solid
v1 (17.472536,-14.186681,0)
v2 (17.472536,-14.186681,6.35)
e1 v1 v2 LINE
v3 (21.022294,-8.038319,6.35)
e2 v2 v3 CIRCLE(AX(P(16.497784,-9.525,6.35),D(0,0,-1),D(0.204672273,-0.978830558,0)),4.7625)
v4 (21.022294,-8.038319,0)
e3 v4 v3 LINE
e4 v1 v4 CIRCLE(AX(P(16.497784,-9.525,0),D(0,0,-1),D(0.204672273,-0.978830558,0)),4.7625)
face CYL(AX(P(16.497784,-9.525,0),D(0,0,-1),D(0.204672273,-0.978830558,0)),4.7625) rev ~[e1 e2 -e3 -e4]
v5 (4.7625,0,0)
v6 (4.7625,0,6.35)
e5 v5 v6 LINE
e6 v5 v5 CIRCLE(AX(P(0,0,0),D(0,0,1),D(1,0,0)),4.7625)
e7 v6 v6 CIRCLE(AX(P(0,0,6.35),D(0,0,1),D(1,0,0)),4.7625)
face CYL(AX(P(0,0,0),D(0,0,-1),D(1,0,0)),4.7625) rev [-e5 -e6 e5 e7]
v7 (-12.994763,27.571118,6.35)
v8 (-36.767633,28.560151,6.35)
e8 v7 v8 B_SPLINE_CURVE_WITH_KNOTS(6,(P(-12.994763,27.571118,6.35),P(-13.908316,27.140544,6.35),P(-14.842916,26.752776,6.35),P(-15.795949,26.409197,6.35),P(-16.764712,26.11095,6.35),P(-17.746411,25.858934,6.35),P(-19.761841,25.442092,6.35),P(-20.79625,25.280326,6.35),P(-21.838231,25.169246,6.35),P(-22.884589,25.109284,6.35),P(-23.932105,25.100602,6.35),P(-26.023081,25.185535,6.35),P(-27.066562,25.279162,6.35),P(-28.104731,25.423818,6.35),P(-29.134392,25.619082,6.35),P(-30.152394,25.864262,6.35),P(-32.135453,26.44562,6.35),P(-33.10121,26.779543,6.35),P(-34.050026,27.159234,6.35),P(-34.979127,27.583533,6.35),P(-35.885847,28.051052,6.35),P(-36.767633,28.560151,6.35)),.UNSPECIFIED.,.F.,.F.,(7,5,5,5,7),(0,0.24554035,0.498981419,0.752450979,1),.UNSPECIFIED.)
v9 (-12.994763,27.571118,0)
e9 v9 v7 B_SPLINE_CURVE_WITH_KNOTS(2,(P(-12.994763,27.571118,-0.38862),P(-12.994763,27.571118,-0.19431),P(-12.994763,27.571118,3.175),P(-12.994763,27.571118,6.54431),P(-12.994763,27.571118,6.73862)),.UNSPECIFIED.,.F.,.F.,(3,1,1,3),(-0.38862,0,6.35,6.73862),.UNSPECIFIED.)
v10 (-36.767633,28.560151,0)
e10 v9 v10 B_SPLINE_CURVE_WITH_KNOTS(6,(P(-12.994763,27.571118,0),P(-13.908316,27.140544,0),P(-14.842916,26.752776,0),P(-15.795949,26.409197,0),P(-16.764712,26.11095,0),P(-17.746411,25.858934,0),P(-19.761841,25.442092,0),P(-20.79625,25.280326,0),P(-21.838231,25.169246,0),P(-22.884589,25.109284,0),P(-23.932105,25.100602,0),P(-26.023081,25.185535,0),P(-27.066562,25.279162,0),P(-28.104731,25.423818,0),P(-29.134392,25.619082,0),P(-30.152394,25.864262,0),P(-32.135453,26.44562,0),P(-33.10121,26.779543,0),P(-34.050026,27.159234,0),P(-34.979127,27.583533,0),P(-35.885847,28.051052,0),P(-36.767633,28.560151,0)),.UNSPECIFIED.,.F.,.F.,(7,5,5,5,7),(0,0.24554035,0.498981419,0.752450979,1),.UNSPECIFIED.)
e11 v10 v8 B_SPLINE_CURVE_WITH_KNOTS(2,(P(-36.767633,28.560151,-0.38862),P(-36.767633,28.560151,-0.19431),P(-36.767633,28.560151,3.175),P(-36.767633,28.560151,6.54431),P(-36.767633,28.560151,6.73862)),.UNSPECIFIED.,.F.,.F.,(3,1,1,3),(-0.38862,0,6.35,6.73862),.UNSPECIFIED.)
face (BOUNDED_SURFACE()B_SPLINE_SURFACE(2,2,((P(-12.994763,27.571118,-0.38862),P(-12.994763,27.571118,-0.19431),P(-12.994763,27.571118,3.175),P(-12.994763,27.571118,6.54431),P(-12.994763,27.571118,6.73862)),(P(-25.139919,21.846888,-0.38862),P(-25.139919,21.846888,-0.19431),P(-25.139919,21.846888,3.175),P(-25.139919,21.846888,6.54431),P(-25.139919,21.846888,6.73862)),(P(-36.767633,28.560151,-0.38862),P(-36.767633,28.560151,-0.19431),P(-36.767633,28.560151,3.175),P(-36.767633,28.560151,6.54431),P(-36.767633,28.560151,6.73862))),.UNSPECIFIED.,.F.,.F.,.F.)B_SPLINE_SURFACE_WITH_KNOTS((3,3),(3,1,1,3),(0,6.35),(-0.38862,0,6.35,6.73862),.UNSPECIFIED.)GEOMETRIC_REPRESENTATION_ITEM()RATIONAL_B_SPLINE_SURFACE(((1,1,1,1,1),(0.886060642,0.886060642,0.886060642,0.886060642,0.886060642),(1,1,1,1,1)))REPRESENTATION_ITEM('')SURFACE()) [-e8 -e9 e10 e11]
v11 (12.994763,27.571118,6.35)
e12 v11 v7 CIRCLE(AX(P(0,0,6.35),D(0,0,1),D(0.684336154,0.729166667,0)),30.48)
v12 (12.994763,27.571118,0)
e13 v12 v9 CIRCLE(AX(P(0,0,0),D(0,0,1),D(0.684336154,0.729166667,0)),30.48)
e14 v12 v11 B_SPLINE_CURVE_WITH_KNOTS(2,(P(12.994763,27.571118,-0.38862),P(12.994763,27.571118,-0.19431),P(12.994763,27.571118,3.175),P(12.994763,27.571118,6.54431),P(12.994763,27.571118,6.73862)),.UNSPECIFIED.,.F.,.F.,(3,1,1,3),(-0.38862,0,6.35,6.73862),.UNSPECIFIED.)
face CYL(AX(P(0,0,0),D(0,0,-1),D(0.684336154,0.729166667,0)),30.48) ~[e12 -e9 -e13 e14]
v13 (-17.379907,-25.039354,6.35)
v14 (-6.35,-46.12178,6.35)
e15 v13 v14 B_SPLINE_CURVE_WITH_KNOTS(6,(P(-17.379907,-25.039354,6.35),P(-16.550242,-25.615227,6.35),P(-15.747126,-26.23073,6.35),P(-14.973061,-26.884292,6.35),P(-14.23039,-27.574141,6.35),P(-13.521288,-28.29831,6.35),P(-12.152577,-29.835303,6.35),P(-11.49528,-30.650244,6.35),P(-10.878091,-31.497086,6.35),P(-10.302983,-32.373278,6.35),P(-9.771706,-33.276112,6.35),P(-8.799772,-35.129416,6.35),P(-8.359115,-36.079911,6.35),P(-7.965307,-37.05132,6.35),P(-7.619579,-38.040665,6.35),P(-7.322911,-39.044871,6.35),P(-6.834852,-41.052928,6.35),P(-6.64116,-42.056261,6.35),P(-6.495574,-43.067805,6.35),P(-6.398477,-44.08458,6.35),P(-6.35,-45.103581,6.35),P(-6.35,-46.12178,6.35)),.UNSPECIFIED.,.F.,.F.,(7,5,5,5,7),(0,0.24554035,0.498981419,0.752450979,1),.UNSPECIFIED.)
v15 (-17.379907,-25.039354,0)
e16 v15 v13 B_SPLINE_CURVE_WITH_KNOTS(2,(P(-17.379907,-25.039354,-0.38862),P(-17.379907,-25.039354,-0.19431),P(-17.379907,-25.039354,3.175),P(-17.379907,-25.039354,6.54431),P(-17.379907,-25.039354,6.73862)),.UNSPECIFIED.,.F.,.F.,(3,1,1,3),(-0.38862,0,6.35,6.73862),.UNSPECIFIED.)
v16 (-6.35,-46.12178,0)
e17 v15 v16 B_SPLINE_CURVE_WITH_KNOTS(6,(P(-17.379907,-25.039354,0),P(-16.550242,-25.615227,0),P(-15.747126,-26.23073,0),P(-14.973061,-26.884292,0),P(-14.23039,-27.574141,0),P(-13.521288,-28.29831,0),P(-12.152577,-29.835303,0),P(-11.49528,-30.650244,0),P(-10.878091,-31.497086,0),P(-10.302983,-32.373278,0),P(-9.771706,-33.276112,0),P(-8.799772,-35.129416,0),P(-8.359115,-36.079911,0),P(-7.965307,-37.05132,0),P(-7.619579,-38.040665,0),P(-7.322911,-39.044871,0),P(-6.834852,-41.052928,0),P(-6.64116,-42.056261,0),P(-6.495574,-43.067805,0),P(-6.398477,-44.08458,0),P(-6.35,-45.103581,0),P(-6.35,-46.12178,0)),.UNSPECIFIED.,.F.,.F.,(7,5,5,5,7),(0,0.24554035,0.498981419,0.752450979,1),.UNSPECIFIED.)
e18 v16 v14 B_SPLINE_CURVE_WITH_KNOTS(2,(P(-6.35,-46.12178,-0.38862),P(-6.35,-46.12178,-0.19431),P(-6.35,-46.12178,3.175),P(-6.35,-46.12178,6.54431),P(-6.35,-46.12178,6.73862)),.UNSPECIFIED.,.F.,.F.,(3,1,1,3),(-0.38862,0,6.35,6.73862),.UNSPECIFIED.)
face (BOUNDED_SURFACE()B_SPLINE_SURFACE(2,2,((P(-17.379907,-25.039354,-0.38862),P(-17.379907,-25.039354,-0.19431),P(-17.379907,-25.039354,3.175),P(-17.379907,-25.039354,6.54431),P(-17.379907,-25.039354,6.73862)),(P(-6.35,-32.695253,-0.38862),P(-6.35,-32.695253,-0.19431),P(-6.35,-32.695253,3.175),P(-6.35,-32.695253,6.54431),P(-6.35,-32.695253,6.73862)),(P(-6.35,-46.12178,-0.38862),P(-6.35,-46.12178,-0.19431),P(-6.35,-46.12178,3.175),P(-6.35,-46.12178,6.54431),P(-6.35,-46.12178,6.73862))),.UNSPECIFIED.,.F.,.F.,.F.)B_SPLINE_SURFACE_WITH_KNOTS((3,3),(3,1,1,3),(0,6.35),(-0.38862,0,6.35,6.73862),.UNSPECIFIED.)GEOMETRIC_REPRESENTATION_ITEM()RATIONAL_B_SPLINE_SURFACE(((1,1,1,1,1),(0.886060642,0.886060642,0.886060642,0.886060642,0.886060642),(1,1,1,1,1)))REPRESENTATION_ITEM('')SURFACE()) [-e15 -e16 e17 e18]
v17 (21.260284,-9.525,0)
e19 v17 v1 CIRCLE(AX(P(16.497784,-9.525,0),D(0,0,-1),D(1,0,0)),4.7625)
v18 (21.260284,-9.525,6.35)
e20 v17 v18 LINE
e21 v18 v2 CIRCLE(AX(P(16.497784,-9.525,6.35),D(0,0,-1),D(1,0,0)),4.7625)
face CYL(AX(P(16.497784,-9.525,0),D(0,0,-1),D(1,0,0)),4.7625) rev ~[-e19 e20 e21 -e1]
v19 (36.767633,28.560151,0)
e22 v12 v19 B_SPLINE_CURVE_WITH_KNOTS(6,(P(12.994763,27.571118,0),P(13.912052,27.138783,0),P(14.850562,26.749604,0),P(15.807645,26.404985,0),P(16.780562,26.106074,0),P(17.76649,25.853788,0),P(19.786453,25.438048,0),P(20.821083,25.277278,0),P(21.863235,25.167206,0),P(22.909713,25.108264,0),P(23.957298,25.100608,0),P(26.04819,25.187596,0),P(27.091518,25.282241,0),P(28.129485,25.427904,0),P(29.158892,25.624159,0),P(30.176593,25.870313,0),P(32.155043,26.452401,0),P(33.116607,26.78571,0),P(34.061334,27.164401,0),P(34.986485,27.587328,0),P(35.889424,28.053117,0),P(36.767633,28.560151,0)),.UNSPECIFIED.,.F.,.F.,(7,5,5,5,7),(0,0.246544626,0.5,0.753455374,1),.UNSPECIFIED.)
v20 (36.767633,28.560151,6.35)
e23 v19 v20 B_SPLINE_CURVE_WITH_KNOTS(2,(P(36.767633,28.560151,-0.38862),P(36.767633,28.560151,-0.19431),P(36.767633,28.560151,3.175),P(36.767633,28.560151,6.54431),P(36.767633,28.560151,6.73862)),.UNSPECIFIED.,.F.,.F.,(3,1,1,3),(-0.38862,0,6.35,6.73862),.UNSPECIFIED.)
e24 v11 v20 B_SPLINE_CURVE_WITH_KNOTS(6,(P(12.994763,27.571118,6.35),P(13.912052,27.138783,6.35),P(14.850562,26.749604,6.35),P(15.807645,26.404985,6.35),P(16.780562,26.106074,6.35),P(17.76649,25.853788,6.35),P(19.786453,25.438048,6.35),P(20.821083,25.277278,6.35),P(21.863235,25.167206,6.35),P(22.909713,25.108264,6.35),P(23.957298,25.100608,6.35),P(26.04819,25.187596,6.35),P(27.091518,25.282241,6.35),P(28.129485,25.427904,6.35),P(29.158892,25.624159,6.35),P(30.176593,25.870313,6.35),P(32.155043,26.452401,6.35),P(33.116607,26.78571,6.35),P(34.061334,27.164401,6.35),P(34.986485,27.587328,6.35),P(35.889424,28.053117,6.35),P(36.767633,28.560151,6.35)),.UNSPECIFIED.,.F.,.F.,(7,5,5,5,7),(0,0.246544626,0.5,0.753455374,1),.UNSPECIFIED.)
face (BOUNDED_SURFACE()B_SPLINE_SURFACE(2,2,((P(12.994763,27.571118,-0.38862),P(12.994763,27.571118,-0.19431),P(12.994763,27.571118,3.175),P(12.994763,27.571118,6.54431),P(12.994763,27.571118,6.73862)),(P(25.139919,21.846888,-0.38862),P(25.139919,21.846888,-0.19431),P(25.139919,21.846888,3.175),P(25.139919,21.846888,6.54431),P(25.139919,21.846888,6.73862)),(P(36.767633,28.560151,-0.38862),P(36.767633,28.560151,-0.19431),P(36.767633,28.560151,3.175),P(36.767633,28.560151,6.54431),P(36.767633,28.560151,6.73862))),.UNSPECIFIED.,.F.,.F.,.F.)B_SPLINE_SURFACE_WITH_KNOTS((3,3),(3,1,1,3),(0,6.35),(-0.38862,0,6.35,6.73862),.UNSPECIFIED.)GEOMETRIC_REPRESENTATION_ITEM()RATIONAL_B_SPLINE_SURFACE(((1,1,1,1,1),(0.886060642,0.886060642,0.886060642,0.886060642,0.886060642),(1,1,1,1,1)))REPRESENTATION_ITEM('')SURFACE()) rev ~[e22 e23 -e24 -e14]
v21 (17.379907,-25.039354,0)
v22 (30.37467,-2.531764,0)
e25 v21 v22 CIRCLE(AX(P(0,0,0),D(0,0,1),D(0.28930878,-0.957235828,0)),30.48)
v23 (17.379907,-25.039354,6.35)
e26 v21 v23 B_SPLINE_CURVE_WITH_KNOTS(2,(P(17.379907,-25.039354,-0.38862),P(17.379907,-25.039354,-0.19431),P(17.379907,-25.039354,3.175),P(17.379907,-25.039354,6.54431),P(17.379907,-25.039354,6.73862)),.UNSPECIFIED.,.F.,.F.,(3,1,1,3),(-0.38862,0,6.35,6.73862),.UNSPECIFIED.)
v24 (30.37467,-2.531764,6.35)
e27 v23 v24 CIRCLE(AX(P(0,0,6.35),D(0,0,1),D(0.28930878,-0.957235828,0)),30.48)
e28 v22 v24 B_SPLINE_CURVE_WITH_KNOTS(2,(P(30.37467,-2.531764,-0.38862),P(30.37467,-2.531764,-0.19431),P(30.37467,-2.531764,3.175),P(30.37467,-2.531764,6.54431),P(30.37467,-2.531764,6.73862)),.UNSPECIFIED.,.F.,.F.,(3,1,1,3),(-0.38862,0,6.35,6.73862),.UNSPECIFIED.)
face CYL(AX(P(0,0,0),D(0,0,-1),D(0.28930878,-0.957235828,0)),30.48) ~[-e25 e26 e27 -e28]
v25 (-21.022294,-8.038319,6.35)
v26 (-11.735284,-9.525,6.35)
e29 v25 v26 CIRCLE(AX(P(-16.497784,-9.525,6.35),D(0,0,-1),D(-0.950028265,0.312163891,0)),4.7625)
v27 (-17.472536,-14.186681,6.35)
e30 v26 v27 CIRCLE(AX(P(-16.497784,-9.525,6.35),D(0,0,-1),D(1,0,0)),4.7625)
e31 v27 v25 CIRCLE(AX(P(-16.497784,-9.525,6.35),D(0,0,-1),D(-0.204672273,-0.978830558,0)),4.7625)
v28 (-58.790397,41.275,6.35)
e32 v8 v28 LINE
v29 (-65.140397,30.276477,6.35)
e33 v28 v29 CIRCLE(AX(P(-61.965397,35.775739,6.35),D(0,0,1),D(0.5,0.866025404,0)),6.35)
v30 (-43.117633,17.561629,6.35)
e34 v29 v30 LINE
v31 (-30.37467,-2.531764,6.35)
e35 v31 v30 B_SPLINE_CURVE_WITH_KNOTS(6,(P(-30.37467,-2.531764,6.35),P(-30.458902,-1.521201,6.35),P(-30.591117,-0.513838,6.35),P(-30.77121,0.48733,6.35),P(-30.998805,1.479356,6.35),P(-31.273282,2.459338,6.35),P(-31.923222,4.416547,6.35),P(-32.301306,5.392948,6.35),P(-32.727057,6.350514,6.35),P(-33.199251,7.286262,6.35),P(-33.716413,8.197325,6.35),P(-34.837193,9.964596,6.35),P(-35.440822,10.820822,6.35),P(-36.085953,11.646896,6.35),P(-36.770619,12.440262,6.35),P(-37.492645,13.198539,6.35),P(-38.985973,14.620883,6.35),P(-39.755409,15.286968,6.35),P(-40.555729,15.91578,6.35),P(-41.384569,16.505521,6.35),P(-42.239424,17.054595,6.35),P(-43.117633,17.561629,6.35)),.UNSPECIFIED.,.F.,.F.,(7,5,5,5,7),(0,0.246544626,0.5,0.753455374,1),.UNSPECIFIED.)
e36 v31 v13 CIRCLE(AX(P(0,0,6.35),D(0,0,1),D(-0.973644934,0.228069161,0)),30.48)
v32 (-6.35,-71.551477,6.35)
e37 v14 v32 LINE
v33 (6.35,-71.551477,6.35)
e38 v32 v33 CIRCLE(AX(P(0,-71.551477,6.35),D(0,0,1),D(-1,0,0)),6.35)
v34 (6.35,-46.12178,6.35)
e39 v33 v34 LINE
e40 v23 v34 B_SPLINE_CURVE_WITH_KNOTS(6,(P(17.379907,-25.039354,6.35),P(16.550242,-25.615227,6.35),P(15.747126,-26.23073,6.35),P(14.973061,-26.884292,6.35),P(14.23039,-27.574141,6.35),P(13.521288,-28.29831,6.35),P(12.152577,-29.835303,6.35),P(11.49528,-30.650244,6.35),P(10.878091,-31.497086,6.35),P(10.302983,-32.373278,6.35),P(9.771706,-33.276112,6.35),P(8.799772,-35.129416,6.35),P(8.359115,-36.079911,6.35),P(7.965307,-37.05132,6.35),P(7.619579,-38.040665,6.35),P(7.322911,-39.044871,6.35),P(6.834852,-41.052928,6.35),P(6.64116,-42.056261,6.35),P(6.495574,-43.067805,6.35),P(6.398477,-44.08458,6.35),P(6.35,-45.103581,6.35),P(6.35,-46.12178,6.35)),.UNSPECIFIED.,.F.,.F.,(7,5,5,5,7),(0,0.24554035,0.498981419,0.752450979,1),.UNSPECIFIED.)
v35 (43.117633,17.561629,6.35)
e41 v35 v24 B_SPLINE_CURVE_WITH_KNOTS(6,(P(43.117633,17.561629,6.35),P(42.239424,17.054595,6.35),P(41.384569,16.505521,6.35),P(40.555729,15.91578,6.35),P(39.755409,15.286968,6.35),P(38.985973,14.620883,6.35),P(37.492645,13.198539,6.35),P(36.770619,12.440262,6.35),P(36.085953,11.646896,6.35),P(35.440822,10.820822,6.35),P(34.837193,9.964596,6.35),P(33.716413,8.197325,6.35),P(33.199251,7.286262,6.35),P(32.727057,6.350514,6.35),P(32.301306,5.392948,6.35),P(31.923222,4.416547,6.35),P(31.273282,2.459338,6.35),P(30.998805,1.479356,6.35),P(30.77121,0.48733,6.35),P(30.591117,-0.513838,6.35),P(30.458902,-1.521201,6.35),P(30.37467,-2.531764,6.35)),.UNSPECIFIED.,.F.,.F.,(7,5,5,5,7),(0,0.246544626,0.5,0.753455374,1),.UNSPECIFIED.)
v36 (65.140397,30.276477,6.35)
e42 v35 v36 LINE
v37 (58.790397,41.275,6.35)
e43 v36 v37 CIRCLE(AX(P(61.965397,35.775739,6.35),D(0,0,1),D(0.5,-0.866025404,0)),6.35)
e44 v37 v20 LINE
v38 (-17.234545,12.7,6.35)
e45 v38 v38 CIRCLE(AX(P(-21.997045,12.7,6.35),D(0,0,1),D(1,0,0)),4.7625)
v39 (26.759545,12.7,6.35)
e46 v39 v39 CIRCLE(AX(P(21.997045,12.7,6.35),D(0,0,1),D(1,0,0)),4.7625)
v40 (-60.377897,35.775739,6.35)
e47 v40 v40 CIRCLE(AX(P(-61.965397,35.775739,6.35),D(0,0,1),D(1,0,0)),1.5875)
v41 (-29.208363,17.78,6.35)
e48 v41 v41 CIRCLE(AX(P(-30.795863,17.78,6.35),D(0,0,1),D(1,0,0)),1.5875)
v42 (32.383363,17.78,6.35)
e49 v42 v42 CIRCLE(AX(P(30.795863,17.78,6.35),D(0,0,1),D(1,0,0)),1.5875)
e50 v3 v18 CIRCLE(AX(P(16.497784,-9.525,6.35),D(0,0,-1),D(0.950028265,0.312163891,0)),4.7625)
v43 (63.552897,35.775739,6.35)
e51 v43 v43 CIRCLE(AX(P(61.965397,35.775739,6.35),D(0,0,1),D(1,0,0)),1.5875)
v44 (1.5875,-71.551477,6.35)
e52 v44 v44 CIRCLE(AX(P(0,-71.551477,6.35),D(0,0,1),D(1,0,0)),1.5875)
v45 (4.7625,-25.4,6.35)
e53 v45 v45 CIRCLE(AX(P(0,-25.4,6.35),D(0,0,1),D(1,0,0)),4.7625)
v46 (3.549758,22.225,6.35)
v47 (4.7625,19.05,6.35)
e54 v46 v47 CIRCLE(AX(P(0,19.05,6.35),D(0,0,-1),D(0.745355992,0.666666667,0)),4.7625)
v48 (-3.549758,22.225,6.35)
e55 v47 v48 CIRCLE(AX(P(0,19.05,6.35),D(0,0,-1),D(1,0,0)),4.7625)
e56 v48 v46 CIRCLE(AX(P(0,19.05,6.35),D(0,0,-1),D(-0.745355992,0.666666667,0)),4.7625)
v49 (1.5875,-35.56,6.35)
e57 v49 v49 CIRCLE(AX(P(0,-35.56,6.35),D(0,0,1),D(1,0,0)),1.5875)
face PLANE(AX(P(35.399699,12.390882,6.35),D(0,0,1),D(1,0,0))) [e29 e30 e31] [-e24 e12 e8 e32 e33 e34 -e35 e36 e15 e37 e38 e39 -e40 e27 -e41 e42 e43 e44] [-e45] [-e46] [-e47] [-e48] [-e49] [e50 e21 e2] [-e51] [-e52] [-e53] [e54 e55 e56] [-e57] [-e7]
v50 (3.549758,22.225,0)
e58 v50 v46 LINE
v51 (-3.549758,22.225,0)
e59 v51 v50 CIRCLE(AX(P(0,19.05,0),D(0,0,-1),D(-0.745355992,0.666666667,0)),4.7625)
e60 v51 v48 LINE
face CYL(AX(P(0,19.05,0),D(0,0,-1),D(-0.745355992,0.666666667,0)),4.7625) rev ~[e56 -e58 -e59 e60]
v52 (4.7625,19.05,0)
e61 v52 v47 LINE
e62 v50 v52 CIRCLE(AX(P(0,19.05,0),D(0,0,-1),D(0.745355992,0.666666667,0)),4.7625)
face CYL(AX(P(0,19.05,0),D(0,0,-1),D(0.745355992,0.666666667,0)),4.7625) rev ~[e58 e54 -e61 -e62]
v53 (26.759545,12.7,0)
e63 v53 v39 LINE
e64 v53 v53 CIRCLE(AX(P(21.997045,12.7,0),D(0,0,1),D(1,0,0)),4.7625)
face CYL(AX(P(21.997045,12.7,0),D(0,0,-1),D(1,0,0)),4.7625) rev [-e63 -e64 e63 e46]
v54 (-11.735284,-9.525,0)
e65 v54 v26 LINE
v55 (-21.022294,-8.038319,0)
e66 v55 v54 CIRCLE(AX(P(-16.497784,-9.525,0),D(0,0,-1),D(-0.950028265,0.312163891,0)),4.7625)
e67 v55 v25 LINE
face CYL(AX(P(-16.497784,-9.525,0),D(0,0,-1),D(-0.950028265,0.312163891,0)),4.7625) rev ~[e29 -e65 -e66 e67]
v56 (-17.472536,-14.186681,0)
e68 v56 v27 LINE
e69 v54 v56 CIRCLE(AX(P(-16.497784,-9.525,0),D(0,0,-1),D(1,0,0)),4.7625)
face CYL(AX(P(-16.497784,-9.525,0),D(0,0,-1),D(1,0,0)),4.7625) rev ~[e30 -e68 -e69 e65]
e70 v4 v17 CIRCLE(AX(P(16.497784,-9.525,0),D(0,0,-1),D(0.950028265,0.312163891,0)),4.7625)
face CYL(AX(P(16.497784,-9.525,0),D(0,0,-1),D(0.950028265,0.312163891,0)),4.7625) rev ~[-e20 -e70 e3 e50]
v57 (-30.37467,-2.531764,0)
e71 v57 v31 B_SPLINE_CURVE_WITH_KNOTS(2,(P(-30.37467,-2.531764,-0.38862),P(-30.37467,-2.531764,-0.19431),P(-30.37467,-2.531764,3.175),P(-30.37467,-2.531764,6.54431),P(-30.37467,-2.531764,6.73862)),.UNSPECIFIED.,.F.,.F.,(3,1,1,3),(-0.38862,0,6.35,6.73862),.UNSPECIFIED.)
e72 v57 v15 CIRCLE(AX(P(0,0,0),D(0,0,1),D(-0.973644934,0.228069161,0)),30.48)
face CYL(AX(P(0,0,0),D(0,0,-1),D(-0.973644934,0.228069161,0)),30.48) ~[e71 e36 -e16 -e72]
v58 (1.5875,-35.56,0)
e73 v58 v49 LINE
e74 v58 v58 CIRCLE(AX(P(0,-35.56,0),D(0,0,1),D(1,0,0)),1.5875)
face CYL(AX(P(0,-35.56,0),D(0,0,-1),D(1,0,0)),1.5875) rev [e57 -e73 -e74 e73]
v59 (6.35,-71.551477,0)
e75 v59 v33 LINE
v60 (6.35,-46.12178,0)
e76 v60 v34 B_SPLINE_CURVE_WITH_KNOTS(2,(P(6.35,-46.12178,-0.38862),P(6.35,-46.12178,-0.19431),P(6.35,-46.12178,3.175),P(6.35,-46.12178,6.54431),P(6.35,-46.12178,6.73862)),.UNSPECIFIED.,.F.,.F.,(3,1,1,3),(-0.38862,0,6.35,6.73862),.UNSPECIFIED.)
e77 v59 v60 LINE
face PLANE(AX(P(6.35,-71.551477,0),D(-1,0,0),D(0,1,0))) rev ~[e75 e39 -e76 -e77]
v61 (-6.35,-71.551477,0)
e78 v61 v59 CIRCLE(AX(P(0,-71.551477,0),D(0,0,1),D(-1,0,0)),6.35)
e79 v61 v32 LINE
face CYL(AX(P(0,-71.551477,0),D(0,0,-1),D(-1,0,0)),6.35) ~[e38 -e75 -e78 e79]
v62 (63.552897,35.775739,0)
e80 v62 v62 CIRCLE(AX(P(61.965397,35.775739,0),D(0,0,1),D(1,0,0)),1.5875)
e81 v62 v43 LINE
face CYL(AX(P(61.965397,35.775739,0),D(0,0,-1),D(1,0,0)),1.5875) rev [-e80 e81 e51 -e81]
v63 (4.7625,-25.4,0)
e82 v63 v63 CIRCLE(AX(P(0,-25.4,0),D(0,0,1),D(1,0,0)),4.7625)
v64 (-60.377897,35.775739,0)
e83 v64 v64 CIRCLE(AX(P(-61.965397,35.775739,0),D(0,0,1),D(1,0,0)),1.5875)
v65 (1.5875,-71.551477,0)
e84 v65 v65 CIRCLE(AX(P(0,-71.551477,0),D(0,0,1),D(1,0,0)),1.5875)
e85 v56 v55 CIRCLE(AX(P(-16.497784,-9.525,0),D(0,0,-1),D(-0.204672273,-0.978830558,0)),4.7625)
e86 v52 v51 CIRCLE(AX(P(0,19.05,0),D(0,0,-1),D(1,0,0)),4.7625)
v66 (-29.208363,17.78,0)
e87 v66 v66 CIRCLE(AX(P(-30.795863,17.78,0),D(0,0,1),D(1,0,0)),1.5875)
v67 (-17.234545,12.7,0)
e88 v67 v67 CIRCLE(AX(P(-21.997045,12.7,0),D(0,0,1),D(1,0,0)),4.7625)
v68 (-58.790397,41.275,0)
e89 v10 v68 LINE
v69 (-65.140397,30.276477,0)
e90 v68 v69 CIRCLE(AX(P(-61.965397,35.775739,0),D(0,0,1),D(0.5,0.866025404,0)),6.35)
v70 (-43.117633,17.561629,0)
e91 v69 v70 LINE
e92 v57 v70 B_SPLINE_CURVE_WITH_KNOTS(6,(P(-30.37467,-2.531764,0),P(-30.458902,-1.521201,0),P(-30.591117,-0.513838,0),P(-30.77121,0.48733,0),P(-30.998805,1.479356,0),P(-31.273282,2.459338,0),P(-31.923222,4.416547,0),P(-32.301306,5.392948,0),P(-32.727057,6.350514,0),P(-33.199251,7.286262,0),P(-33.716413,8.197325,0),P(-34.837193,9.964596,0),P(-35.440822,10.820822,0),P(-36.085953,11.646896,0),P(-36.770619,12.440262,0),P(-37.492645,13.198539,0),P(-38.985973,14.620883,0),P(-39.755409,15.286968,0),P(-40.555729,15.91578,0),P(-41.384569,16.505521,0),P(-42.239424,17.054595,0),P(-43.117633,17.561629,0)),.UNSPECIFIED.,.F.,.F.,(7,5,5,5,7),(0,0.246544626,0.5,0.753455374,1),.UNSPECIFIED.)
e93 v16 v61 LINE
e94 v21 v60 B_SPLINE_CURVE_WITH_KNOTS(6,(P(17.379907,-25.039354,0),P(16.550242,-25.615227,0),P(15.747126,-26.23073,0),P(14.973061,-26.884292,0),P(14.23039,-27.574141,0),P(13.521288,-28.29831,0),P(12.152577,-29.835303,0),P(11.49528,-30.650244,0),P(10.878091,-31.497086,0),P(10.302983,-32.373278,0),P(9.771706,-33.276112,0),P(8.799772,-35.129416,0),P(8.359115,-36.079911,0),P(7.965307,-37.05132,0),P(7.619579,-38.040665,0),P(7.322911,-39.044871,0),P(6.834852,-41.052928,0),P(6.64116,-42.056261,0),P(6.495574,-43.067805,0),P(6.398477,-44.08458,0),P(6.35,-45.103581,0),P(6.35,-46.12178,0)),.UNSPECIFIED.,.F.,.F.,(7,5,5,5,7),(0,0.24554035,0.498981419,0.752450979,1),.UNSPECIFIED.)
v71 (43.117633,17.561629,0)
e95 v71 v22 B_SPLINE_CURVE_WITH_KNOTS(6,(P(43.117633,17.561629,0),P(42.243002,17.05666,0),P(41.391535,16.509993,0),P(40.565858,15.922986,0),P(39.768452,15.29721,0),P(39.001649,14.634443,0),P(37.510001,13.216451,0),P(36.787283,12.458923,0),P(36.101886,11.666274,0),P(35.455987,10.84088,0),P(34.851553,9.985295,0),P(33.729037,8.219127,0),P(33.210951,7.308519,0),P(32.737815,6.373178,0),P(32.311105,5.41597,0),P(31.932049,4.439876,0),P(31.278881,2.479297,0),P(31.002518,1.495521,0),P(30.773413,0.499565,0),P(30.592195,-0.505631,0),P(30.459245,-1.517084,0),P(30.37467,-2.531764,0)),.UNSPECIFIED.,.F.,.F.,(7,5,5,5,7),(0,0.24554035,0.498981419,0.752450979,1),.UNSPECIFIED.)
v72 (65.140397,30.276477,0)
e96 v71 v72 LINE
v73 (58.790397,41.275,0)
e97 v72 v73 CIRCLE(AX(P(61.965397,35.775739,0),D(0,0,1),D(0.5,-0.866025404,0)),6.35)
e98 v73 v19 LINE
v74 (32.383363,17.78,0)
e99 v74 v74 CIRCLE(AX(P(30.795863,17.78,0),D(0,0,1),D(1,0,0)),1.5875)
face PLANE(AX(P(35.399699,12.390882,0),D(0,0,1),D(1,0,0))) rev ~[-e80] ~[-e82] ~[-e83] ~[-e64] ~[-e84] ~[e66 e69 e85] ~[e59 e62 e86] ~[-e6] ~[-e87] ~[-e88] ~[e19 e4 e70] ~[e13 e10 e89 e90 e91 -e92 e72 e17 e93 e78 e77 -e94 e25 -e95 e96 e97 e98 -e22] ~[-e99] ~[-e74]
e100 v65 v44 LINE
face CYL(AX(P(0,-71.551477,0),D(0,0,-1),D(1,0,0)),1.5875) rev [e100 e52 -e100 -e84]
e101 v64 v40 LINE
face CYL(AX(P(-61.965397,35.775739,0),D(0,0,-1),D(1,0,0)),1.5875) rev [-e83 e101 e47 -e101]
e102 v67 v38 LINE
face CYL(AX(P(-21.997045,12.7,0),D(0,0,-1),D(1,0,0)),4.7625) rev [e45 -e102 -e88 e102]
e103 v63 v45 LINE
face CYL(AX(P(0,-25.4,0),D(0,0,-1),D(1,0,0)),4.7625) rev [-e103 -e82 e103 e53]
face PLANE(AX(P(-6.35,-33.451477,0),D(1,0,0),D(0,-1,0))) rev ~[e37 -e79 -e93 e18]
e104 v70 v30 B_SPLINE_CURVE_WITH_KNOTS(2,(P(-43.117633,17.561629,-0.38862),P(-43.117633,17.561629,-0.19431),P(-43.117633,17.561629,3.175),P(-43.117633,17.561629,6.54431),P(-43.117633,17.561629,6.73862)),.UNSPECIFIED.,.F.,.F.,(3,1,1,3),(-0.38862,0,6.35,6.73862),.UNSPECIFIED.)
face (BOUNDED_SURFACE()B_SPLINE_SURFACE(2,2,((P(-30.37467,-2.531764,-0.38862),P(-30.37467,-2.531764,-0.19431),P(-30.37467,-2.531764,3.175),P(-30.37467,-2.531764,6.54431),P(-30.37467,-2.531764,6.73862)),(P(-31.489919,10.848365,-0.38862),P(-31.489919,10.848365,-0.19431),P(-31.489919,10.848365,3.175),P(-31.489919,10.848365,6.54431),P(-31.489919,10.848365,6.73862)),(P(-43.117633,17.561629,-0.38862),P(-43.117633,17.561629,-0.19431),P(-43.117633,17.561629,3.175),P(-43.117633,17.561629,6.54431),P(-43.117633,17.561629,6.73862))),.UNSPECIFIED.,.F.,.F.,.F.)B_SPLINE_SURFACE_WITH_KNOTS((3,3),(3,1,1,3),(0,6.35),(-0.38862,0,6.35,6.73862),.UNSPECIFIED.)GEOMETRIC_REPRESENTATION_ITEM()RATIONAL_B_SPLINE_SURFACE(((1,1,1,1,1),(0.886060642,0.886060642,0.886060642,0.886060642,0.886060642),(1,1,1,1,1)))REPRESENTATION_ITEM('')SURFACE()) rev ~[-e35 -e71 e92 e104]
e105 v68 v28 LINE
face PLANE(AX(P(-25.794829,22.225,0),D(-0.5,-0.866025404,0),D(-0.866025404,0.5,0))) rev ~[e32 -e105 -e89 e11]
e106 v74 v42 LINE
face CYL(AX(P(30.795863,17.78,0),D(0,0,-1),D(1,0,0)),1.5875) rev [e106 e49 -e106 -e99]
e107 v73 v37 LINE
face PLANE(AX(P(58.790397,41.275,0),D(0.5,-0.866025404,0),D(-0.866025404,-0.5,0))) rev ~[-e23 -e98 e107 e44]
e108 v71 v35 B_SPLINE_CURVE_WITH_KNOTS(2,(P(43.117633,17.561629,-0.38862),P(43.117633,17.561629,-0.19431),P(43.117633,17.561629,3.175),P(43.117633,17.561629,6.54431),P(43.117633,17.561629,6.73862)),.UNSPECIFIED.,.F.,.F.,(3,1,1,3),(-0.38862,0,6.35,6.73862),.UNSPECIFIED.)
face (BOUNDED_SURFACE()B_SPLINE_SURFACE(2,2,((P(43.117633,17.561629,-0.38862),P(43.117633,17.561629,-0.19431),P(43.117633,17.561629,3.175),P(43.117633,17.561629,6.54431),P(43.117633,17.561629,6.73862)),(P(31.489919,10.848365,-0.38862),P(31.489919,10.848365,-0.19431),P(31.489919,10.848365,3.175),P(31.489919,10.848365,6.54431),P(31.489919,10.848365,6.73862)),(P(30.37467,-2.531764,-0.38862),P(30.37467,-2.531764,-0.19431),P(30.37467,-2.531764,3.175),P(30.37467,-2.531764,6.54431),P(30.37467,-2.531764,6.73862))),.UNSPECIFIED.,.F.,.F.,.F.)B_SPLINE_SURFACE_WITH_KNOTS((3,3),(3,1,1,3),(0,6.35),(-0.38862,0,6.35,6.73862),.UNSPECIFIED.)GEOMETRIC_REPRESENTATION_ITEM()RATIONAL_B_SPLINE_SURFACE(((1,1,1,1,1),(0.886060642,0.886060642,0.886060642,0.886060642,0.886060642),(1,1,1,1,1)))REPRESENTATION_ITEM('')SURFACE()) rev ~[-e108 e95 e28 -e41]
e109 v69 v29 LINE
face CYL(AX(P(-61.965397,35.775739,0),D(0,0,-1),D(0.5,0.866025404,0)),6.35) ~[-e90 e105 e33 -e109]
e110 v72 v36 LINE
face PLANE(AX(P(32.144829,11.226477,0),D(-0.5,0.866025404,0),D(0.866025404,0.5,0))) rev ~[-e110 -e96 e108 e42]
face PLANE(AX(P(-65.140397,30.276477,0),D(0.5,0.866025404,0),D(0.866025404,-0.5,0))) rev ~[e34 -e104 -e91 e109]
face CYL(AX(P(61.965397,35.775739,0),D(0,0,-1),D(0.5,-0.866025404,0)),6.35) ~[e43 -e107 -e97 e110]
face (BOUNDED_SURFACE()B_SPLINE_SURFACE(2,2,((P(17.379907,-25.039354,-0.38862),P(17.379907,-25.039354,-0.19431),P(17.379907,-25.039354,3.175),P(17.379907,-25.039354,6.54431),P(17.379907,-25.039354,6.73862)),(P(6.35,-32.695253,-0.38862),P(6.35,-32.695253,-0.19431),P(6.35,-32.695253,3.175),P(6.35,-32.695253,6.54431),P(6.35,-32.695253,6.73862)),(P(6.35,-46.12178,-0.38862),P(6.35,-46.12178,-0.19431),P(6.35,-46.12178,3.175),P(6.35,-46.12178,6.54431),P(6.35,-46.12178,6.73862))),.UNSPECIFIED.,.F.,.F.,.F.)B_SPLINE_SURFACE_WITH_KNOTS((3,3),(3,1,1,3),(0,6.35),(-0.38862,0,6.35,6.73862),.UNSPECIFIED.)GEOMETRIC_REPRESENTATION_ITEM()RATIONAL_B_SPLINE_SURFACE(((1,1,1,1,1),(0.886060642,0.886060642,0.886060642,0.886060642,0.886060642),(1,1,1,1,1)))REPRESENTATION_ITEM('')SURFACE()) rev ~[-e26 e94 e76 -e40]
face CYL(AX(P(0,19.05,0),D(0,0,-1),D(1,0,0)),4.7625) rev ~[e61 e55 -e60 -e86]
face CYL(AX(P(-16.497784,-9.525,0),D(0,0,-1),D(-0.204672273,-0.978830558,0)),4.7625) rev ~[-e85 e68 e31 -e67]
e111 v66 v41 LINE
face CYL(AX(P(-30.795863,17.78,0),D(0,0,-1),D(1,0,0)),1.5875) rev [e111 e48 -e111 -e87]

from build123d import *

# Parameters (mm, degrees)
F0_R        = 1.5875
F0_R_2      = 4.7625
F1_DEPTH    = 6.35
F2_T1_DEPTH = 6.35
F3_R        = 25.6632962838


# Not quite as in the source:
# - a fillet or chamfer that OpenCascade refuses, or shapes differently, is made with other operations: its cross-section is extruded or revolved along the edge and cut away or added
# - a length typed as a fraction of an inch, garbled in the dataset ("3 / 203.2 mm" for 3/8 in), is restored


with BuildPart() as f1:
    # F0 (on Top) → F1 (new body)
    with BuildSketch(Plane.XY):
        with BuildLine():
            Line((25.7948291982, 22.225), (38.4948291982, 22.225))
            Line((38.4948291982, 22.225), (32.1448291982, 11.2264773719))
            Line((32.1448291982, 11.2264773719), (65.1403970824, 30.2764773719))
            ThreePointArc((65.1403970824, 30.2764773719), (67.4646583964, 38.950738686), (58.7903970824, 41.275))
            Line((58.7903970824, 41.275), (25.7948291982, 22.225))
        make_face()
        with Locations((61.9653970824, 35.775738686)):
            Circle(F0_R, mode=Mode.SUBTRACT)
        with BuildLine():
            Line((32.1448291982, 11.2264773719), (38.4948291982, 22.225))
            Line((38.4948291982, 22.225), (25.7948291982, 22.225))
            Line((25.7948291982, 22.225), (20.8585659862, 22.225))
            ThreePointArc((20.8585659862, 22.225), (26.3964543073, 15.24), (29.6766975922, 6.9515480306))
            Line((29.6766975922, 6.9515480306), (32.1448291982, 11.2264773719))
        make_face()
        with Locations((30.7958633586, 17.78)):
            Circle(F0_R, mode=Mode.SUBTRACT)
        with BuildLine():
            ThreePointArc((30.48, 0), (30.2785084062, 3.4989039276), (29.6766975922, 6.9515480306))
            Line((29.6766975922, 6.9515480306), (21.0222935562, -8.0383194689))
            ThreePointArc((21.0222935562, -8.0383194689), (21.2004099791, -8.7721955059), (21.2602839421, -9.525))
            ThreePointArc((21.2602839421, -9.525), (20.1939753076, -12.5282608344), (17.472535642, -14.1866805311))
            Line((17.472535642, -14.1866805311), (8.818131606, -29.1765480305))
            ThreePointArc((8.818131606, -29.1765480305), (24.4725055047, -18.1693938898), (30.48, 0))
        make_face()
        with BuildLine():
            Line((21.0222935562, -8.0383194689), (29.6766975922, 6.9515480306))
            ThreePointArc((29.6766975922, 6.9515480306), (26.3964543073, 15.24), (20.8585659862, 22.225))
            Line((20.8585659862, 22.225), (3.5497579143, 22.225))
            ThreePointArc((3.5497579143, 22.225), (4.4489958596, 20.7493652025), (4.7625, 19.05))
            ThreePointArc((4.7625, 19.05), (-1.6993652025, 14.6010041404), (-3.5497579143, 22.225))
            Line((-3.5497579143, 22.225), (-20.8585659862, 22.225))
            ThreePointArc((-20.8585659862, 22.225), (-26.3964543073, 15.24), (-29.6766975922, 6.9515480306))
            Line((-29.6766975922, 6.9515480306), (-21.0222935562, -8.0383194689))
            ThreePointArc((-21.0222935562, -8.0383194689), (-15.744979448, -4.822373963), (-11.7352839421, -9.525))
            ThreePointArc((-11.7352839421, -9.525), (-13.4945231077, -13.2211913655), (-17.472535642, -14.1866805311))
            Line((-17.472535642, -14.1866805311), (-8.818131606, -29.1765480305))
            ThreePointArc((-8.818131606, -29.1765480305), (0, -30.48), (8.818131606, -29.1765480305))
            Line((8.818131606, -29.1765480305), (17.472535642, -14.1866805311))
            ThreePointArc((17.472535642, -14.1866805311), (12.3733379566, -7.14375), (21.0222935562, -8.0383194689))
        make_face()
        with Locations((0, -25.4)):
            Circle(F0_R_2, mode=Mode.SUBTRACT)
        with Locations((-21.9970452561, 12.7)):
            Circle(F0_R_2, mode=Mode.SUBTRACT)
        Circle(F0_R_2, mode=Mode.SUBTRACT)
        with Locations((21.9970452561, 12.7)):
            Circle(F0_R_2, mode=Mode.SUBTRACT)
        with BuildLine():
            Line((3.5497579143, 22.225), (20.8585659862, 22.225))
            ThreePointArc((20.8585659862, 22.225), (0, 30.48), (-20.8585659862, 22.225))
            Line((-20.8585659862, 22.225), (-3.5497579143, 22.225))
            ThreePointArc((-3.5497579143, 22.225), (0, 23.8125), (3.5497579143, 22.225))
        make_face()
        with BuildLine():
            ThreePointArc((-29.6766975922, 6.9515480306), (-26.3964543073, 15.24), (-20.8585659862, 22.225))
            Line((-20.8585659862, 22.225), (-25.7948291982, 22.225))
            Line((-25.7948291982, 22.225), (-38.4948291982, 22.225))
            Line((-38.4948291982, 22.225), (-32.1448291982, 11.2264773719))
            Line((-32.1448291982, 11.2264773719), (-29.6766975922, 6.9515480306))
        make_face()
        with Locations((-30.7958633586, 17.78)):
            Circle(F0_R, mode=Mode.SUBTRACT)
        with BuildLine():
            Line((6.35, -33.4514773719), (8.818131606, -29.1765480305))
            ThreePointArc((8.818131606, -29.1765480305), (0, -30.48), (-8.818131606, -29.1765480305))
            Line((-8.818131606, -29.1765480305), (-6.35, -33.4514773719))
            Line((-6.35, -33.4514773719), (0, -44.45))
            Line((0, -44.45), (6.35, -33.4514773719))
        make_face()
        with Locations((0, -35.56)):
            Circle(F0_R, mode=Mode.SUBTRACT)
        with BuildLine():
            Line((-38.4948291982, 22.225), (-25.7948291982, 22.225))
            Line((-25.7948291982, 22.225), (-58.7903970824, 41.275))
            ThreePointArc((-58.7903970824, 41.275), (-67.4646583964, 38.950738686), (-65.1403970824, 30.2764773719))
            Line((-65.1403970824, 30.2764773719), (-32.1448291982, 11.2264773719))
            Line((-32.1448291982, 11.2264773719), (-38.4948291982, 22.225))
        make_face()
        with Locations((-61.9653970824, 35.775738686)):
            Circle(F0_R, mode=Mode.SUBTRACT)
        with BuildLine():
            Line((-21.0222935562, -8.0383194689), (-29.6766975922, 6.9515480306))
            ThreePointArc((-29.6766975922, 6.9515480306), (-26.3964543073, -15.24), (-8.818131606, -29.1765480305))
            Line((-8.818131606, -29.1765480305), (-17.472535642, -14.1866805311))
            ThreePointArc((-17.472535642, -14.1866805311), (-20.6222299276, -11.90625), (-21.0222935562, -8.0383194689))
        make_face()
        with BuildLine():
            Line((6.35, -71.5514773719), (6.35, -33.4514773719))
            Line((6.35, -33.4514773719), (0, -44.45))
            Line((0, -44.45), (-6.35, -33.4514773719))
            Line((-6.35, -33.4514773719), (-6.35, -71.5514773719))
            ThreePointArc((-6.35, -71.5514773719), (0, -77.9014773719), (6.35, -71.5514773719))
        make_face()
        with Locations((0, -71.5514773719)):
            Circle(F0_R, mode=Mode.SUBTRACT)
    extrude(amount=F1_DEPTH)

    # F2: fillet of radius 50.8 on 6 edges, made by hand

    # F2_s2 → F2_t1 (join)
    with BuildSketch(Plane.XY):
        with BuildLine():
            ThreePointArc((29.6766975922, 6.9515480306), (35.4424077678, 12.4134665997), (41.9889550232, 16.9099860669))
            Line((41.9889550232, 16.9099860669), (32.1448291982, 11.2264773719))
            Line((32.1448291982, 11.2264773719), (29.6766975922, 6.9515480306))
        make_face()
        with BuildLine():
            ThreePointArc((35.6389550232, 27.908508695), (28.4715813083, 24.4872921983), (20.8585659862, 22.225))
            Line((20.8585659862, 22.225), (25.7948291982, 22.225))
            Line((25.7948291982, 22.225), (35.6389550232, 27.908508695))
        make_face()
        with BuildLine():
            ThreePointArc((-20.8585659862, 22.225), (-28.4715813083, 24.4872921983), (-35.6389550232, 27.908508695))
            Line((-35.6389550232, 27.908508695), (-25.7948291982, 22.225))
            Line((-25.7948291982, 22.225), (-20.8585659862, 22.225))
        make_face()
        with BuildLine():
            ThreePointArc((-41.9889550232, 16.9099860669), (-35.4424077678, 12.4134665997), (-29.6766975922, 6.9515480306))
            Line((-29.6766975922, 6.9515480306), (-32.1448291982, 11.2264773719))
            Line((-32.1448291982, 11.2264773719), (-41.9889550232, 16.9099860669))
        make_face()
        with BuildLine():
            ThreePointArc((-8.818131606, -29.1765480305), (-6.9708264595, -36.9007587981), (-6.35, -44.8184947619))
            Line((-6.35, -44.8184947619), (-6.35, -33.4514773719))
            Line((-6.35, -33.4514773719), (-8.818131606, -29.1765480305))
        make_face()
        with BuildLine():
            ThreePointArc((6.35, -44.8184947619), (6.9708264595, -36.9007587981), (8.818131606, -29.1765480305))
            Line((8.818131606, -29.1765480305), (6.35, -33.4514773719))
            Line((6.35, -33.4514773719), (6.35, -44.8184947619))
        make_face()
    extrude(amount=F2_T1_DEPTH)

    # F3
    f3_edges = [f1.edges().sort_by_distance(p)[0] for p in [
        (-29.676698, 6.951548, 3.175),
        (-8.818132, -29.176548, 3.175),
        (8.818132, -29.176548, 3.175),
        (29.676698, 6.951548, 3.175),
        (20.858566, 22.225, 3.175),
        (-20.858566, 22.225, 3.175),
    ]]
    fillet(f3_edges, radius=F3_R)


solid = f1.part
